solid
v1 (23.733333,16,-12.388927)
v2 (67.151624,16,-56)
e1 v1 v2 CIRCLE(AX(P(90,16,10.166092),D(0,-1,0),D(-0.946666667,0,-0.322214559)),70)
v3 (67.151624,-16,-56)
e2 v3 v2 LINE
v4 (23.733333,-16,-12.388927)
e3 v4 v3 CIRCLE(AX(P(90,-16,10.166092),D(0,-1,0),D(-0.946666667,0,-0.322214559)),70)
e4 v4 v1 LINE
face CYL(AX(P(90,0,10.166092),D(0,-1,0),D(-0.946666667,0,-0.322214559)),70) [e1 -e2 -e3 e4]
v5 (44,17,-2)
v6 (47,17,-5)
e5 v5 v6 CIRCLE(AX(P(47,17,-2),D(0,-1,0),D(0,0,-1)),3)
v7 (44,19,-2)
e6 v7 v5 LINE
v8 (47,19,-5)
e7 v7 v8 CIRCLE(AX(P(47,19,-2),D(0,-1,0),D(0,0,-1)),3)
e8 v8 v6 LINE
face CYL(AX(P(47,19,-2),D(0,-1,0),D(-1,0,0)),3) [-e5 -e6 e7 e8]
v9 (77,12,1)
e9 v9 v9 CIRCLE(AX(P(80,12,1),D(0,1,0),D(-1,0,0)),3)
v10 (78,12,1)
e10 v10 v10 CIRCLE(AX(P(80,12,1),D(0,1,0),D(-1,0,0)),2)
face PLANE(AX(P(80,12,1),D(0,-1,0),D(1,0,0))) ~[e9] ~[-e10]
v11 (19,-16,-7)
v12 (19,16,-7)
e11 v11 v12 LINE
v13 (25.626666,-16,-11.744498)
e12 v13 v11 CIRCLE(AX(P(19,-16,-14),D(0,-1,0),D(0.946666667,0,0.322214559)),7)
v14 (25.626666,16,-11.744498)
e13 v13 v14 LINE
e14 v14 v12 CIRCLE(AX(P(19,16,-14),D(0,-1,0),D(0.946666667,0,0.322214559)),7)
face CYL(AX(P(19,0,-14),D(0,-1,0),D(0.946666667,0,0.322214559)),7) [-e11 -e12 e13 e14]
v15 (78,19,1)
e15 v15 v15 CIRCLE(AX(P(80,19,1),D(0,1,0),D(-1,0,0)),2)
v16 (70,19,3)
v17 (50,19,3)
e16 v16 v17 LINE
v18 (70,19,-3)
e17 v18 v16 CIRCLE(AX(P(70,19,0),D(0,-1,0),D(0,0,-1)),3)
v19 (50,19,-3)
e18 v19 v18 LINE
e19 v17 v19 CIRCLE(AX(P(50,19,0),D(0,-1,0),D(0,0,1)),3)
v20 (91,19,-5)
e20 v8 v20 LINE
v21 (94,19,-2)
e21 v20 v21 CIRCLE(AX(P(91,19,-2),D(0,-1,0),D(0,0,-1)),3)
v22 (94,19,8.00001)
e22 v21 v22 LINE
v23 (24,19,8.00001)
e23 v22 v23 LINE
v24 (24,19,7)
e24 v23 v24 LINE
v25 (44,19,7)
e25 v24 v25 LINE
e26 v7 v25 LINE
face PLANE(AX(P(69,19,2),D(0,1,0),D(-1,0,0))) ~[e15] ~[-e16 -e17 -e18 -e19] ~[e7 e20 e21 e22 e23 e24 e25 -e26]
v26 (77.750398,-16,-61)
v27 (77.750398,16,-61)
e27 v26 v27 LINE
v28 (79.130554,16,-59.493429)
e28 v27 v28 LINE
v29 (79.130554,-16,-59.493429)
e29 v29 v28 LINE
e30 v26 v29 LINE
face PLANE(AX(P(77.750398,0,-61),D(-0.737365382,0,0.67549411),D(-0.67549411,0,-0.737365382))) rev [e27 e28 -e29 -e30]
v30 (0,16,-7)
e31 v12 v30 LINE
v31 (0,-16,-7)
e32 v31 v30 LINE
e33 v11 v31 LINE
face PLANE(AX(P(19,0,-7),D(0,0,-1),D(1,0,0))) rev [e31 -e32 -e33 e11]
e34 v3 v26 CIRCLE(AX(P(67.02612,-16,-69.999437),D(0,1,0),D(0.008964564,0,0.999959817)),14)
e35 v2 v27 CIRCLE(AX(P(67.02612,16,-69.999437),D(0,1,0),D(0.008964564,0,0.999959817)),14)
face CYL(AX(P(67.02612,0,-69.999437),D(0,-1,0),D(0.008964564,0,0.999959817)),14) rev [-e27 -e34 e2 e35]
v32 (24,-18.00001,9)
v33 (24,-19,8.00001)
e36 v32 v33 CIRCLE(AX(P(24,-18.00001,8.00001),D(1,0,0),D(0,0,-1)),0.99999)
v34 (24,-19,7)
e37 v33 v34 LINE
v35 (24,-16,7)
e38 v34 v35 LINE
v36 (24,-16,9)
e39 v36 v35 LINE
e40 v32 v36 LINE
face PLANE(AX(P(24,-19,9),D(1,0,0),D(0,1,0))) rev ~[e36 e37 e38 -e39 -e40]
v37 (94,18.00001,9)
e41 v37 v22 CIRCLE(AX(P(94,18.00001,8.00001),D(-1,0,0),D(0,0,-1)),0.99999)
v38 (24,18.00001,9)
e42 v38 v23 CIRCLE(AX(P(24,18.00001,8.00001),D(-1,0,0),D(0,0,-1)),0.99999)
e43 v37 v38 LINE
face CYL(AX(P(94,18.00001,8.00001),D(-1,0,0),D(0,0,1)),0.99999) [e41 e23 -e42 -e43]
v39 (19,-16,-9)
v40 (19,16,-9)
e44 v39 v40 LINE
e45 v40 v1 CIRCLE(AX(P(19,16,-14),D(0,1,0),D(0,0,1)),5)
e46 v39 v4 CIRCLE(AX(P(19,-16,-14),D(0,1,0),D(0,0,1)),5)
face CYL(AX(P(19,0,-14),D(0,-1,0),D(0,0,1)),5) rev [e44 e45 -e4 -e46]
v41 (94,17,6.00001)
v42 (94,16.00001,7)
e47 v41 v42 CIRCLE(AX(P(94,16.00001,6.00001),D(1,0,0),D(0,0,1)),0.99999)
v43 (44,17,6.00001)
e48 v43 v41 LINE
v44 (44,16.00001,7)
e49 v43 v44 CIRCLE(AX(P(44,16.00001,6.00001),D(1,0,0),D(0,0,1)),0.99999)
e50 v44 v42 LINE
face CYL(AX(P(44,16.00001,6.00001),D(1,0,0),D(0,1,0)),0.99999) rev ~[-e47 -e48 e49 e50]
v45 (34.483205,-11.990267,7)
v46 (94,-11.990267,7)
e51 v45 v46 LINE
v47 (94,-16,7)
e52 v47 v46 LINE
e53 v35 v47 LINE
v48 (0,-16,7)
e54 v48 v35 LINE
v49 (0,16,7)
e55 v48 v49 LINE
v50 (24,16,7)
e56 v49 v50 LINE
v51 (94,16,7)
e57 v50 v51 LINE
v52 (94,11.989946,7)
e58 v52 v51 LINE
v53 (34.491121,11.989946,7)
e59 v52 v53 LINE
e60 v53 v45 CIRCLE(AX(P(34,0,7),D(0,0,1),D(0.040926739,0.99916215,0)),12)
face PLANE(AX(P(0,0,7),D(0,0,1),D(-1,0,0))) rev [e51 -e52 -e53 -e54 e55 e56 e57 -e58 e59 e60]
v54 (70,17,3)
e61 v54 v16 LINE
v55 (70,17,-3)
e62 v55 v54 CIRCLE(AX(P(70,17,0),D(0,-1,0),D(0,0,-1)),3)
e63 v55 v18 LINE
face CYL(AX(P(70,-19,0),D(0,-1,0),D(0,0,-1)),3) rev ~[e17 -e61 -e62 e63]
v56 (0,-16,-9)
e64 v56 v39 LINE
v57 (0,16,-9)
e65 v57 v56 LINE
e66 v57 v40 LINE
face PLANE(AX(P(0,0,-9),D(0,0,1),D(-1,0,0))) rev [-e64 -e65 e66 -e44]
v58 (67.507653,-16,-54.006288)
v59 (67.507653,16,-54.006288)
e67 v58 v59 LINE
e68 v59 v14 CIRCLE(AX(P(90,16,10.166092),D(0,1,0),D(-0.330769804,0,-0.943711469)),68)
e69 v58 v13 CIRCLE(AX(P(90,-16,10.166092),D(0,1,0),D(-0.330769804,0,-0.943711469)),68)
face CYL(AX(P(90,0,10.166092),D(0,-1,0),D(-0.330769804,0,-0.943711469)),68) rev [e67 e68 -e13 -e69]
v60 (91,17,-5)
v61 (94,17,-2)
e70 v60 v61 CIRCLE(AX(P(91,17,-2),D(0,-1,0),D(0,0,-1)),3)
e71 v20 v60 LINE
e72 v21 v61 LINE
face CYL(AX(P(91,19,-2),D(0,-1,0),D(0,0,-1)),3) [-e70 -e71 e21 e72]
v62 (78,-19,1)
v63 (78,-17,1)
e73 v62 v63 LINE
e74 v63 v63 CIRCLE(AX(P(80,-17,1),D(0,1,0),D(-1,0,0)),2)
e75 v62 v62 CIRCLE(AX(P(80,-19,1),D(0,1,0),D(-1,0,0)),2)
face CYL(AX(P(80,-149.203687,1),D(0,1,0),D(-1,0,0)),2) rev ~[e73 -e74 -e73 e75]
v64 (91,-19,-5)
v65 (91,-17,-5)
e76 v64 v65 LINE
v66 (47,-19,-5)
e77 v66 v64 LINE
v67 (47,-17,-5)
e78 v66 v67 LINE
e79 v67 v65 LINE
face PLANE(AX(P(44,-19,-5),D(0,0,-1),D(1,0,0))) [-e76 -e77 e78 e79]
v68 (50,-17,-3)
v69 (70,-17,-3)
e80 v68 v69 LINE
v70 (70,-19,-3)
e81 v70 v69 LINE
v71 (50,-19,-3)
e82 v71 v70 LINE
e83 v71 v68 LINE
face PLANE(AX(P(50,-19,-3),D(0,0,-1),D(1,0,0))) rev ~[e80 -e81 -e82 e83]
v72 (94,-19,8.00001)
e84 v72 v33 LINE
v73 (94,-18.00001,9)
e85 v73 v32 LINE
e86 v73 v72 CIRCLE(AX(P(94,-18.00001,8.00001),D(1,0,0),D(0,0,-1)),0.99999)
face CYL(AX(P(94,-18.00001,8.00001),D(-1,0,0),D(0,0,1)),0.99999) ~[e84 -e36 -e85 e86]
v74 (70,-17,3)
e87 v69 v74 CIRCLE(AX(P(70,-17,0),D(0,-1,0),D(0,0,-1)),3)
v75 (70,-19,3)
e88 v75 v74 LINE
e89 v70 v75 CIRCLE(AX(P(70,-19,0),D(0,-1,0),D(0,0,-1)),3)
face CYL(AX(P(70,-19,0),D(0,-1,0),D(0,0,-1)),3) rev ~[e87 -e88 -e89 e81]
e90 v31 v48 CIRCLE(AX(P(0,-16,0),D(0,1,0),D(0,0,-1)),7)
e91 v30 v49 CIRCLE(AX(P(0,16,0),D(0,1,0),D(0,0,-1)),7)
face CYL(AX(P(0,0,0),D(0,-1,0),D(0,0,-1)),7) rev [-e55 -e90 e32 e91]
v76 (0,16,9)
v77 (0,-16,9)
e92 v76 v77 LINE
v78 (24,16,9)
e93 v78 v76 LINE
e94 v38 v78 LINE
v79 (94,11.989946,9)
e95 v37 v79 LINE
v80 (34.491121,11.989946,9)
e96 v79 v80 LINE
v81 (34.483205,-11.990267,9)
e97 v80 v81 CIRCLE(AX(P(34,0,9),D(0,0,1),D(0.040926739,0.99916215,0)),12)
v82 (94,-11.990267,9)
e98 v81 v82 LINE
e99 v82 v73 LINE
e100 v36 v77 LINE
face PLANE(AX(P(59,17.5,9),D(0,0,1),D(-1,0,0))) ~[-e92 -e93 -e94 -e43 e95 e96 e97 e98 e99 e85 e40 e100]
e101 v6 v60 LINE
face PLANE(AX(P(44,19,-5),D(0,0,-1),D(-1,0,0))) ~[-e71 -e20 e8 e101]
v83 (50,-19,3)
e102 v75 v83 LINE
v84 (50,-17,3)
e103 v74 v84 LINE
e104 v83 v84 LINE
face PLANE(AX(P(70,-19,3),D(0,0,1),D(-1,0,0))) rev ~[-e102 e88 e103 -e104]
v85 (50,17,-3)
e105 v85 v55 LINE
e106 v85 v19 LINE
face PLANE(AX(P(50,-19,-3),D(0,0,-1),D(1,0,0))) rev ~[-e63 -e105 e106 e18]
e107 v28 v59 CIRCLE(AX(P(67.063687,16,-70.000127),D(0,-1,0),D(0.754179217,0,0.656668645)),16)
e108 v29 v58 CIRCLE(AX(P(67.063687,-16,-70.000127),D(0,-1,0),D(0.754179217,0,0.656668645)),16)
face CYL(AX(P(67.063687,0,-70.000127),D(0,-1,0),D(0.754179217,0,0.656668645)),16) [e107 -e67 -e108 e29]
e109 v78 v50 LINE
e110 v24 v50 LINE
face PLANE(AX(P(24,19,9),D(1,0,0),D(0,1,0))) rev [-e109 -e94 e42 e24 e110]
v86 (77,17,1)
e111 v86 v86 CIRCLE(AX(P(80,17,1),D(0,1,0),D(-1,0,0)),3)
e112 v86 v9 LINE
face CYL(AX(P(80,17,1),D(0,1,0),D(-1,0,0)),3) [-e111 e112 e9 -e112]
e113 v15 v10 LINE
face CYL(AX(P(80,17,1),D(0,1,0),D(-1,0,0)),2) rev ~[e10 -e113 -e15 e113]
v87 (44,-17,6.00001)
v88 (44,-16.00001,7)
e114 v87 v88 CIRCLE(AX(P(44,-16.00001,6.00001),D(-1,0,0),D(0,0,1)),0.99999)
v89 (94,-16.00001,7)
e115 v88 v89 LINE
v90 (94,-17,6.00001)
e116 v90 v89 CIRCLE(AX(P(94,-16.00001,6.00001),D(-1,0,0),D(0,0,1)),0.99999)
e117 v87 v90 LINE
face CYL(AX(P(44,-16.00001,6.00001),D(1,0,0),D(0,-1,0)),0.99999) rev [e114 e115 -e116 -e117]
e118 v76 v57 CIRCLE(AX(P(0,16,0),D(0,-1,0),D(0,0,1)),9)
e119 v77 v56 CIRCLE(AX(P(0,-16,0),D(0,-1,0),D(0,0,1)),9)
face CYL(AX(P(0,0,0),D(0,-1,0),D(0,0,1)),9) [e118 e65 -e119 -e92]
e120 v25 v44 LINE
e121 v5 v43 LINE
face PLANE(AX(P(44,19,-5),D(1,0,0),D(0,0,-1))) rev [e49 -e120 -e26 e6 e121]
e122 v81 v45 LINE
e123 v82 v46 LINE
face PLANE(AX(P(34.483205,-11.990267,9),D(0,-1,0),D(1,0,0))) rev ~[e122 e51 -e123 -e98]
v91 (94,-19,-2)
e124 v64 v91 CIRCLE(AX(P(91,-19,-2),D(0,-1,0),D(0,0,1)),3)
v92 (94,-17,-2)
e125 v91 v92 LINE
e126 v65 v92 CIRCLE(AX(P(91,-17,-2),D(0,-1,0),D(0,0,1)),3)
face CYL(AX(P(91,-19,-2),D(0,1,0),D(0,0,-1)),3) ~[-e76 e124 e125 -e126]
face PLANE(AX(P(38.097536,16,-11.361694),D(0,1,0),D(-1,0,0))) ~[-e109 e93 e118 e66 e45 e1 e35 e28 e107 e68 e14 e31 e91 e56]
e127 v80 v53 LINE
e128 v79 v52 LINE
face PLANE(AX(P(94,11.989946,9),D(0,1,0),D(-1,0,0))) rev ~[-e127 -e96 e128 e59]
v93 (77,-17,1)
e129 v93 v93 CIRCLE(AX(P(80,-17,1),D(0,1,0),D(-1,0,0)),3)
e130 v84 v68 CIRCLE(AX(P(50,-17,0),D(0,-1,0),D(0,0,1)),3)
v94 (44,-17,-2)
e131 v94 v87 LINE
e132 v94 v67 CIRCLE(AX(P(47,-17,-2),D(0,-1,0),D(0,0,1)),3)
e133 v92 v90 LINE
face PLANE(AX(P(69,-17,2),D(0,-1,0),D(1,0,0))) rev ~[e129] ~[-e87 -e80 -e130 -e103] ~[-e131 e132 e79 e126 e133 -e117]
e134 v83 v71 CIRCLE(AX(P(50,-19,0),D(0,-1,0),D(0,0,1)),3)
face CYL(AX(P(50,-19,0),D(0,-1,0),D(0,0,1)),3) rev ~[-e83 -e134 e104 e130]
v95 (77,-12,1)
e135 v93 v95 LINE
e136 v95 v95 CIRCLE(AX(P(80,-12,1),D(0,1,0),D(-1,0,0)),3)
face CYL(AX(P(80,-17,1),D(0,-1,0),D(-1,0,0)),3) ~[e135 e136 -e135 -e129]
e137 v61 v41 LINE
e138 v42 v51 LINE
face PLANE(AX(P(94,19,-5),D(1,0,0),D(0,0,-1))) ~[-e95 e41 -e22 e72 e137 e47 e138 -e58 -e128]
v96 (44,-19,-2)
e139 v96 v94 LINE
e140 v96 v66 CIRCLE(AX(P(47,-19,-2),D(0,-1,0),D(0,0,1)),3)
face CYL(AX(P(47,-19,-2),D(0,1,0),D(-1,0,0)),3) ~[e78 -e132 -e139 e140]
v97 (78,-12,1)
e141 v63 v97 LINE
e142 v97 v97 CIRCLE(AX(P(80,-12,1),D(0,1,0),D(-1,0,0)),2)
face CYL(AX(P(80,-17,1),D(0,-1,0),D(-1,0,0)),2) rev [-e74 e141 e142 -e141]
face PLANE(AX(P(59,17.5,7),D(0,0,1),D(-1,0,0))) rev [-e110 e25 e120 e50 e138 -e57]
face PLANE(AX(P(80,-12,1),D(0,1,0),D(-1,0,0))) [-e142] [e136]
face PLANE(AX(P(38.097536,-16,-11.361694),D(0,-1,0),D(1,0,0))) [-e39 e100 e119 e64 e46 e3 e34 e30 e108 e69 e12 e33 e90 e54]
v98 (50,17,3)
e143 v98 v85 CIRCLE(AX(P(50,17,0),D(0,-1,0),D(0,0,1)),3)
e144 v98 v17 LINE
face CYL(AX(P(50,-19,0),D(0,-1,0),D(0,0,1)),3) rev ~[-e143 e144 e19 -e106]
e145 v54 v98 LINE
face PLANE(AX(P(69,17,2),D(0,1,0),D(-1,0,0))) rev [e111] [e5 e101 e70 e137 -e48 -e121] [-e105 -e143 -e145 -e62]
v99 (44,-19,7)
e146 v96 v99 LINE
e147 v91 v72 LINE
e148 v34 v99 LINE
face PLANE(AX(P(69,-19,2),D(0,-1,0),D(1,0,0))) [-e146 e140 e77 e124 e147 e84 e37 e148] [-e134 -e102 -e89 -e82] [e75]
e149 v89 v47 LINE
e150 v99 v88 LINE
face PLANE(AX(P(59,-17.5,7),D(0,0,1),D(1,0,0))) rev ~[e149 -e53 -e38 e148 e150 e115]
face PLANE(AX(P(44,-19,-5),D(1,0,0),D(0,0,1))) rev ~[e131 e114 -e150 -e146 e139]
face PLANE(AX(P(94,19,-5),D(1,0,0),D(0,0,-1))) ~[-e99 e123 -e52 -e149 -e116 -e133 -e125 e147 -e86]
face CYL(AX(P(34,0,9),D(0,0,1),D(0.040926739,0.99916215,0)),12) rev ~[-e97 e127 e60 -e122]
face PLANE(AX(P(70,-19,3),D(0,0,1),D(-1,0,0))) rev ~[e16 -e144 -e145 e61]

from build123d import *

# Parameters (mm, degrees)
F1_DEPTH  = 16
F2_W      = 70
F2_H      = 3
F3_DEPTH  = 2
F4_W      = 50
F4_H      = 14
F5_DEPTH  = 2
F6_R      = 0.99999
F9_DEPTH  = 2
F11_DEPTH = 38.001
F13_D     = 4
F14_R     = 3
F14_R_2   = 2
F15_DEPTH = 5
F16_R     = 3


# Not quite as in the source:
# - a fillet or chamfer is up to 0.001 mm smaller than in the source, because OpenCascade refuses the exact size
# - a pattern or mirror of a feature is missing from the dataset's text; its kind, count and spacing are read off the source's solid


with BuildPart() as f1:
    # F0 (on Front) → F1 (new body)
    with BuildSketch(Plane.XZ):
        with BuildLine():
            Line((94, 9), (0, 9))
            ThreePointArc((0, 9), (-9, 0), (0, -9))
            Line((0, -9), (19, -9))
            ThreePointArc((19, -9), (21.9107246536, -9.9345748081), (23.7333333333, -12.3889272035))
            ThreePointArc((23.7333333333, -12.3889272035), (40.3930033582, -39.2216179023), (67.1516242057, -56))
            ThreePointArc((67.1516242057, -56), (72.9993471235, -57.3376618382), (77.7503977132, -61))
            Line((77.7503977132, -61), (79.1305544342, -59.4934290732))
            ThreePointArc((79.1305544342, -59.4934290732), (73.8943105869, -55.5314515361), (67.507653226, -54.0062881394))
            ThreePointArc((67.507653226, -54.0062881394), (41.6996239436, -37.699069728), (25.6266664621, -11.7444981545))
            ThreePointArc((25.6266664621, -11.7444981545), (23.0750143892, -8.308404907), (19, -7.0000002161))
            Line((19, -7.0000002161), (0, -7.0000002161))
            ThreePointArc((0, -7.0000002161), (-7.0000002161, 0), (0, 7.0000002161))
            Line((0, 7.0000002161), (94, 7.0000002161))
            Line((94, 7.0000002161), (94, 9))
        make_face()
    extrude(amount=F1_DEPTH)

    # F2 (on face) → F3 (join)
    with BuildSketch(Plane.XY.offset(9)):
        with Locations((59, -17.5)):
            Rectangle(F2_W, F2_H)
    extrude(amount=-F3_DEPTH)

    # F4 (on face) → F5 (join)
    with BuildSketch(Plane.XZ.offset(19)):
        with Locations((69, 2)):
            Rectangle(F4_W, F4_H)
    extrude(amount=-F5_DEPTH)

    # F6 (radius 1 in the source; OpenCascade refuses exactly that, so slightly less here)
    f6_edges = [f1.edges().sort_by_distance(p)[0] for p in [
        (69, -17, 7),
        (59, -19, 9),
    ]]
    fillet(f6_edges, radius=F6_R)

    # F7: F1 across face


with BuildPart() as f1_1:
    add(f1.part)
    add(f1.part.mirror(Plane(origin=(37.3146952464, 0, -11.3167767816), x_dir=(1, 0, 0), z_dir=(0, 1, 0))))

    # F8 (on face) → F9 (cut)
    with BuildSketch(Plane.XY.offset(9)):
        with BuildLine():
            Line((94, 11.9899458001), (34.491120871, 11.9899458001))
            ThreePointArc((34.491120871, 11.9899458001), (22.0000006537, 0.0039610115), (34.4832053788, -11.9902674099))
            Line((34.4832053788, -11.9902674099), (94, -11.9902674099))
            Line((94, -11.9902674099), (94, 11.9899458001))
        make_face()
    extrude(amount=-F9_DEPTH, mode=Mode.SUBTRACT)

    # F10 (on face) → F11 (cut, through all)
    with BuildSketch(Plane.XZ.offset(19)):
        with BuildLine():
            ThreePointArc((50, 3), (47, 0), (50, -3))
            Line((50, -3), (70, -3))
            ThreePointArc((70, -3), (73, 0), (70, 3))
            Line((70, 3), (50, 3))
        make_face()
    extrude(amount=-F11_DEPTH, mode=Mode.SUBTRACT)

    # F13 (through all)
    with Locations(Plane.XZ.offset(19)):
        with Locations((80, 1)):
            Hole(F13_D / 2)

    # F14 (on face) → F15 (join)
    with BuildSketch(Plane(origin=(0, -17, 0), x_dir=(-1, 0, 0), z_dir=(0, 1, 0))):
        with Locations((-80, 1)):
            Circle(F14_R)
        with Locations((-80, 1)):
            Circle(F14_R_2, mode=Mode.SUBTRACT)
    f15 = extrude(amount=F15_DEPTH)

    # F15_copies: F15 across plane
    add(f15.mirror(Plane.ZX))

    # F16
    f16_edges = [f1_1.edges().sort_by_distance(p)[0] for p in [
        (94, 18, -5),
        (94, -18, -5),
        (44, -18, -5),
        (44, 18, -5),
    ]]
    fillet(f16_edges, radius=F16_R)


solid = f1_1.part
